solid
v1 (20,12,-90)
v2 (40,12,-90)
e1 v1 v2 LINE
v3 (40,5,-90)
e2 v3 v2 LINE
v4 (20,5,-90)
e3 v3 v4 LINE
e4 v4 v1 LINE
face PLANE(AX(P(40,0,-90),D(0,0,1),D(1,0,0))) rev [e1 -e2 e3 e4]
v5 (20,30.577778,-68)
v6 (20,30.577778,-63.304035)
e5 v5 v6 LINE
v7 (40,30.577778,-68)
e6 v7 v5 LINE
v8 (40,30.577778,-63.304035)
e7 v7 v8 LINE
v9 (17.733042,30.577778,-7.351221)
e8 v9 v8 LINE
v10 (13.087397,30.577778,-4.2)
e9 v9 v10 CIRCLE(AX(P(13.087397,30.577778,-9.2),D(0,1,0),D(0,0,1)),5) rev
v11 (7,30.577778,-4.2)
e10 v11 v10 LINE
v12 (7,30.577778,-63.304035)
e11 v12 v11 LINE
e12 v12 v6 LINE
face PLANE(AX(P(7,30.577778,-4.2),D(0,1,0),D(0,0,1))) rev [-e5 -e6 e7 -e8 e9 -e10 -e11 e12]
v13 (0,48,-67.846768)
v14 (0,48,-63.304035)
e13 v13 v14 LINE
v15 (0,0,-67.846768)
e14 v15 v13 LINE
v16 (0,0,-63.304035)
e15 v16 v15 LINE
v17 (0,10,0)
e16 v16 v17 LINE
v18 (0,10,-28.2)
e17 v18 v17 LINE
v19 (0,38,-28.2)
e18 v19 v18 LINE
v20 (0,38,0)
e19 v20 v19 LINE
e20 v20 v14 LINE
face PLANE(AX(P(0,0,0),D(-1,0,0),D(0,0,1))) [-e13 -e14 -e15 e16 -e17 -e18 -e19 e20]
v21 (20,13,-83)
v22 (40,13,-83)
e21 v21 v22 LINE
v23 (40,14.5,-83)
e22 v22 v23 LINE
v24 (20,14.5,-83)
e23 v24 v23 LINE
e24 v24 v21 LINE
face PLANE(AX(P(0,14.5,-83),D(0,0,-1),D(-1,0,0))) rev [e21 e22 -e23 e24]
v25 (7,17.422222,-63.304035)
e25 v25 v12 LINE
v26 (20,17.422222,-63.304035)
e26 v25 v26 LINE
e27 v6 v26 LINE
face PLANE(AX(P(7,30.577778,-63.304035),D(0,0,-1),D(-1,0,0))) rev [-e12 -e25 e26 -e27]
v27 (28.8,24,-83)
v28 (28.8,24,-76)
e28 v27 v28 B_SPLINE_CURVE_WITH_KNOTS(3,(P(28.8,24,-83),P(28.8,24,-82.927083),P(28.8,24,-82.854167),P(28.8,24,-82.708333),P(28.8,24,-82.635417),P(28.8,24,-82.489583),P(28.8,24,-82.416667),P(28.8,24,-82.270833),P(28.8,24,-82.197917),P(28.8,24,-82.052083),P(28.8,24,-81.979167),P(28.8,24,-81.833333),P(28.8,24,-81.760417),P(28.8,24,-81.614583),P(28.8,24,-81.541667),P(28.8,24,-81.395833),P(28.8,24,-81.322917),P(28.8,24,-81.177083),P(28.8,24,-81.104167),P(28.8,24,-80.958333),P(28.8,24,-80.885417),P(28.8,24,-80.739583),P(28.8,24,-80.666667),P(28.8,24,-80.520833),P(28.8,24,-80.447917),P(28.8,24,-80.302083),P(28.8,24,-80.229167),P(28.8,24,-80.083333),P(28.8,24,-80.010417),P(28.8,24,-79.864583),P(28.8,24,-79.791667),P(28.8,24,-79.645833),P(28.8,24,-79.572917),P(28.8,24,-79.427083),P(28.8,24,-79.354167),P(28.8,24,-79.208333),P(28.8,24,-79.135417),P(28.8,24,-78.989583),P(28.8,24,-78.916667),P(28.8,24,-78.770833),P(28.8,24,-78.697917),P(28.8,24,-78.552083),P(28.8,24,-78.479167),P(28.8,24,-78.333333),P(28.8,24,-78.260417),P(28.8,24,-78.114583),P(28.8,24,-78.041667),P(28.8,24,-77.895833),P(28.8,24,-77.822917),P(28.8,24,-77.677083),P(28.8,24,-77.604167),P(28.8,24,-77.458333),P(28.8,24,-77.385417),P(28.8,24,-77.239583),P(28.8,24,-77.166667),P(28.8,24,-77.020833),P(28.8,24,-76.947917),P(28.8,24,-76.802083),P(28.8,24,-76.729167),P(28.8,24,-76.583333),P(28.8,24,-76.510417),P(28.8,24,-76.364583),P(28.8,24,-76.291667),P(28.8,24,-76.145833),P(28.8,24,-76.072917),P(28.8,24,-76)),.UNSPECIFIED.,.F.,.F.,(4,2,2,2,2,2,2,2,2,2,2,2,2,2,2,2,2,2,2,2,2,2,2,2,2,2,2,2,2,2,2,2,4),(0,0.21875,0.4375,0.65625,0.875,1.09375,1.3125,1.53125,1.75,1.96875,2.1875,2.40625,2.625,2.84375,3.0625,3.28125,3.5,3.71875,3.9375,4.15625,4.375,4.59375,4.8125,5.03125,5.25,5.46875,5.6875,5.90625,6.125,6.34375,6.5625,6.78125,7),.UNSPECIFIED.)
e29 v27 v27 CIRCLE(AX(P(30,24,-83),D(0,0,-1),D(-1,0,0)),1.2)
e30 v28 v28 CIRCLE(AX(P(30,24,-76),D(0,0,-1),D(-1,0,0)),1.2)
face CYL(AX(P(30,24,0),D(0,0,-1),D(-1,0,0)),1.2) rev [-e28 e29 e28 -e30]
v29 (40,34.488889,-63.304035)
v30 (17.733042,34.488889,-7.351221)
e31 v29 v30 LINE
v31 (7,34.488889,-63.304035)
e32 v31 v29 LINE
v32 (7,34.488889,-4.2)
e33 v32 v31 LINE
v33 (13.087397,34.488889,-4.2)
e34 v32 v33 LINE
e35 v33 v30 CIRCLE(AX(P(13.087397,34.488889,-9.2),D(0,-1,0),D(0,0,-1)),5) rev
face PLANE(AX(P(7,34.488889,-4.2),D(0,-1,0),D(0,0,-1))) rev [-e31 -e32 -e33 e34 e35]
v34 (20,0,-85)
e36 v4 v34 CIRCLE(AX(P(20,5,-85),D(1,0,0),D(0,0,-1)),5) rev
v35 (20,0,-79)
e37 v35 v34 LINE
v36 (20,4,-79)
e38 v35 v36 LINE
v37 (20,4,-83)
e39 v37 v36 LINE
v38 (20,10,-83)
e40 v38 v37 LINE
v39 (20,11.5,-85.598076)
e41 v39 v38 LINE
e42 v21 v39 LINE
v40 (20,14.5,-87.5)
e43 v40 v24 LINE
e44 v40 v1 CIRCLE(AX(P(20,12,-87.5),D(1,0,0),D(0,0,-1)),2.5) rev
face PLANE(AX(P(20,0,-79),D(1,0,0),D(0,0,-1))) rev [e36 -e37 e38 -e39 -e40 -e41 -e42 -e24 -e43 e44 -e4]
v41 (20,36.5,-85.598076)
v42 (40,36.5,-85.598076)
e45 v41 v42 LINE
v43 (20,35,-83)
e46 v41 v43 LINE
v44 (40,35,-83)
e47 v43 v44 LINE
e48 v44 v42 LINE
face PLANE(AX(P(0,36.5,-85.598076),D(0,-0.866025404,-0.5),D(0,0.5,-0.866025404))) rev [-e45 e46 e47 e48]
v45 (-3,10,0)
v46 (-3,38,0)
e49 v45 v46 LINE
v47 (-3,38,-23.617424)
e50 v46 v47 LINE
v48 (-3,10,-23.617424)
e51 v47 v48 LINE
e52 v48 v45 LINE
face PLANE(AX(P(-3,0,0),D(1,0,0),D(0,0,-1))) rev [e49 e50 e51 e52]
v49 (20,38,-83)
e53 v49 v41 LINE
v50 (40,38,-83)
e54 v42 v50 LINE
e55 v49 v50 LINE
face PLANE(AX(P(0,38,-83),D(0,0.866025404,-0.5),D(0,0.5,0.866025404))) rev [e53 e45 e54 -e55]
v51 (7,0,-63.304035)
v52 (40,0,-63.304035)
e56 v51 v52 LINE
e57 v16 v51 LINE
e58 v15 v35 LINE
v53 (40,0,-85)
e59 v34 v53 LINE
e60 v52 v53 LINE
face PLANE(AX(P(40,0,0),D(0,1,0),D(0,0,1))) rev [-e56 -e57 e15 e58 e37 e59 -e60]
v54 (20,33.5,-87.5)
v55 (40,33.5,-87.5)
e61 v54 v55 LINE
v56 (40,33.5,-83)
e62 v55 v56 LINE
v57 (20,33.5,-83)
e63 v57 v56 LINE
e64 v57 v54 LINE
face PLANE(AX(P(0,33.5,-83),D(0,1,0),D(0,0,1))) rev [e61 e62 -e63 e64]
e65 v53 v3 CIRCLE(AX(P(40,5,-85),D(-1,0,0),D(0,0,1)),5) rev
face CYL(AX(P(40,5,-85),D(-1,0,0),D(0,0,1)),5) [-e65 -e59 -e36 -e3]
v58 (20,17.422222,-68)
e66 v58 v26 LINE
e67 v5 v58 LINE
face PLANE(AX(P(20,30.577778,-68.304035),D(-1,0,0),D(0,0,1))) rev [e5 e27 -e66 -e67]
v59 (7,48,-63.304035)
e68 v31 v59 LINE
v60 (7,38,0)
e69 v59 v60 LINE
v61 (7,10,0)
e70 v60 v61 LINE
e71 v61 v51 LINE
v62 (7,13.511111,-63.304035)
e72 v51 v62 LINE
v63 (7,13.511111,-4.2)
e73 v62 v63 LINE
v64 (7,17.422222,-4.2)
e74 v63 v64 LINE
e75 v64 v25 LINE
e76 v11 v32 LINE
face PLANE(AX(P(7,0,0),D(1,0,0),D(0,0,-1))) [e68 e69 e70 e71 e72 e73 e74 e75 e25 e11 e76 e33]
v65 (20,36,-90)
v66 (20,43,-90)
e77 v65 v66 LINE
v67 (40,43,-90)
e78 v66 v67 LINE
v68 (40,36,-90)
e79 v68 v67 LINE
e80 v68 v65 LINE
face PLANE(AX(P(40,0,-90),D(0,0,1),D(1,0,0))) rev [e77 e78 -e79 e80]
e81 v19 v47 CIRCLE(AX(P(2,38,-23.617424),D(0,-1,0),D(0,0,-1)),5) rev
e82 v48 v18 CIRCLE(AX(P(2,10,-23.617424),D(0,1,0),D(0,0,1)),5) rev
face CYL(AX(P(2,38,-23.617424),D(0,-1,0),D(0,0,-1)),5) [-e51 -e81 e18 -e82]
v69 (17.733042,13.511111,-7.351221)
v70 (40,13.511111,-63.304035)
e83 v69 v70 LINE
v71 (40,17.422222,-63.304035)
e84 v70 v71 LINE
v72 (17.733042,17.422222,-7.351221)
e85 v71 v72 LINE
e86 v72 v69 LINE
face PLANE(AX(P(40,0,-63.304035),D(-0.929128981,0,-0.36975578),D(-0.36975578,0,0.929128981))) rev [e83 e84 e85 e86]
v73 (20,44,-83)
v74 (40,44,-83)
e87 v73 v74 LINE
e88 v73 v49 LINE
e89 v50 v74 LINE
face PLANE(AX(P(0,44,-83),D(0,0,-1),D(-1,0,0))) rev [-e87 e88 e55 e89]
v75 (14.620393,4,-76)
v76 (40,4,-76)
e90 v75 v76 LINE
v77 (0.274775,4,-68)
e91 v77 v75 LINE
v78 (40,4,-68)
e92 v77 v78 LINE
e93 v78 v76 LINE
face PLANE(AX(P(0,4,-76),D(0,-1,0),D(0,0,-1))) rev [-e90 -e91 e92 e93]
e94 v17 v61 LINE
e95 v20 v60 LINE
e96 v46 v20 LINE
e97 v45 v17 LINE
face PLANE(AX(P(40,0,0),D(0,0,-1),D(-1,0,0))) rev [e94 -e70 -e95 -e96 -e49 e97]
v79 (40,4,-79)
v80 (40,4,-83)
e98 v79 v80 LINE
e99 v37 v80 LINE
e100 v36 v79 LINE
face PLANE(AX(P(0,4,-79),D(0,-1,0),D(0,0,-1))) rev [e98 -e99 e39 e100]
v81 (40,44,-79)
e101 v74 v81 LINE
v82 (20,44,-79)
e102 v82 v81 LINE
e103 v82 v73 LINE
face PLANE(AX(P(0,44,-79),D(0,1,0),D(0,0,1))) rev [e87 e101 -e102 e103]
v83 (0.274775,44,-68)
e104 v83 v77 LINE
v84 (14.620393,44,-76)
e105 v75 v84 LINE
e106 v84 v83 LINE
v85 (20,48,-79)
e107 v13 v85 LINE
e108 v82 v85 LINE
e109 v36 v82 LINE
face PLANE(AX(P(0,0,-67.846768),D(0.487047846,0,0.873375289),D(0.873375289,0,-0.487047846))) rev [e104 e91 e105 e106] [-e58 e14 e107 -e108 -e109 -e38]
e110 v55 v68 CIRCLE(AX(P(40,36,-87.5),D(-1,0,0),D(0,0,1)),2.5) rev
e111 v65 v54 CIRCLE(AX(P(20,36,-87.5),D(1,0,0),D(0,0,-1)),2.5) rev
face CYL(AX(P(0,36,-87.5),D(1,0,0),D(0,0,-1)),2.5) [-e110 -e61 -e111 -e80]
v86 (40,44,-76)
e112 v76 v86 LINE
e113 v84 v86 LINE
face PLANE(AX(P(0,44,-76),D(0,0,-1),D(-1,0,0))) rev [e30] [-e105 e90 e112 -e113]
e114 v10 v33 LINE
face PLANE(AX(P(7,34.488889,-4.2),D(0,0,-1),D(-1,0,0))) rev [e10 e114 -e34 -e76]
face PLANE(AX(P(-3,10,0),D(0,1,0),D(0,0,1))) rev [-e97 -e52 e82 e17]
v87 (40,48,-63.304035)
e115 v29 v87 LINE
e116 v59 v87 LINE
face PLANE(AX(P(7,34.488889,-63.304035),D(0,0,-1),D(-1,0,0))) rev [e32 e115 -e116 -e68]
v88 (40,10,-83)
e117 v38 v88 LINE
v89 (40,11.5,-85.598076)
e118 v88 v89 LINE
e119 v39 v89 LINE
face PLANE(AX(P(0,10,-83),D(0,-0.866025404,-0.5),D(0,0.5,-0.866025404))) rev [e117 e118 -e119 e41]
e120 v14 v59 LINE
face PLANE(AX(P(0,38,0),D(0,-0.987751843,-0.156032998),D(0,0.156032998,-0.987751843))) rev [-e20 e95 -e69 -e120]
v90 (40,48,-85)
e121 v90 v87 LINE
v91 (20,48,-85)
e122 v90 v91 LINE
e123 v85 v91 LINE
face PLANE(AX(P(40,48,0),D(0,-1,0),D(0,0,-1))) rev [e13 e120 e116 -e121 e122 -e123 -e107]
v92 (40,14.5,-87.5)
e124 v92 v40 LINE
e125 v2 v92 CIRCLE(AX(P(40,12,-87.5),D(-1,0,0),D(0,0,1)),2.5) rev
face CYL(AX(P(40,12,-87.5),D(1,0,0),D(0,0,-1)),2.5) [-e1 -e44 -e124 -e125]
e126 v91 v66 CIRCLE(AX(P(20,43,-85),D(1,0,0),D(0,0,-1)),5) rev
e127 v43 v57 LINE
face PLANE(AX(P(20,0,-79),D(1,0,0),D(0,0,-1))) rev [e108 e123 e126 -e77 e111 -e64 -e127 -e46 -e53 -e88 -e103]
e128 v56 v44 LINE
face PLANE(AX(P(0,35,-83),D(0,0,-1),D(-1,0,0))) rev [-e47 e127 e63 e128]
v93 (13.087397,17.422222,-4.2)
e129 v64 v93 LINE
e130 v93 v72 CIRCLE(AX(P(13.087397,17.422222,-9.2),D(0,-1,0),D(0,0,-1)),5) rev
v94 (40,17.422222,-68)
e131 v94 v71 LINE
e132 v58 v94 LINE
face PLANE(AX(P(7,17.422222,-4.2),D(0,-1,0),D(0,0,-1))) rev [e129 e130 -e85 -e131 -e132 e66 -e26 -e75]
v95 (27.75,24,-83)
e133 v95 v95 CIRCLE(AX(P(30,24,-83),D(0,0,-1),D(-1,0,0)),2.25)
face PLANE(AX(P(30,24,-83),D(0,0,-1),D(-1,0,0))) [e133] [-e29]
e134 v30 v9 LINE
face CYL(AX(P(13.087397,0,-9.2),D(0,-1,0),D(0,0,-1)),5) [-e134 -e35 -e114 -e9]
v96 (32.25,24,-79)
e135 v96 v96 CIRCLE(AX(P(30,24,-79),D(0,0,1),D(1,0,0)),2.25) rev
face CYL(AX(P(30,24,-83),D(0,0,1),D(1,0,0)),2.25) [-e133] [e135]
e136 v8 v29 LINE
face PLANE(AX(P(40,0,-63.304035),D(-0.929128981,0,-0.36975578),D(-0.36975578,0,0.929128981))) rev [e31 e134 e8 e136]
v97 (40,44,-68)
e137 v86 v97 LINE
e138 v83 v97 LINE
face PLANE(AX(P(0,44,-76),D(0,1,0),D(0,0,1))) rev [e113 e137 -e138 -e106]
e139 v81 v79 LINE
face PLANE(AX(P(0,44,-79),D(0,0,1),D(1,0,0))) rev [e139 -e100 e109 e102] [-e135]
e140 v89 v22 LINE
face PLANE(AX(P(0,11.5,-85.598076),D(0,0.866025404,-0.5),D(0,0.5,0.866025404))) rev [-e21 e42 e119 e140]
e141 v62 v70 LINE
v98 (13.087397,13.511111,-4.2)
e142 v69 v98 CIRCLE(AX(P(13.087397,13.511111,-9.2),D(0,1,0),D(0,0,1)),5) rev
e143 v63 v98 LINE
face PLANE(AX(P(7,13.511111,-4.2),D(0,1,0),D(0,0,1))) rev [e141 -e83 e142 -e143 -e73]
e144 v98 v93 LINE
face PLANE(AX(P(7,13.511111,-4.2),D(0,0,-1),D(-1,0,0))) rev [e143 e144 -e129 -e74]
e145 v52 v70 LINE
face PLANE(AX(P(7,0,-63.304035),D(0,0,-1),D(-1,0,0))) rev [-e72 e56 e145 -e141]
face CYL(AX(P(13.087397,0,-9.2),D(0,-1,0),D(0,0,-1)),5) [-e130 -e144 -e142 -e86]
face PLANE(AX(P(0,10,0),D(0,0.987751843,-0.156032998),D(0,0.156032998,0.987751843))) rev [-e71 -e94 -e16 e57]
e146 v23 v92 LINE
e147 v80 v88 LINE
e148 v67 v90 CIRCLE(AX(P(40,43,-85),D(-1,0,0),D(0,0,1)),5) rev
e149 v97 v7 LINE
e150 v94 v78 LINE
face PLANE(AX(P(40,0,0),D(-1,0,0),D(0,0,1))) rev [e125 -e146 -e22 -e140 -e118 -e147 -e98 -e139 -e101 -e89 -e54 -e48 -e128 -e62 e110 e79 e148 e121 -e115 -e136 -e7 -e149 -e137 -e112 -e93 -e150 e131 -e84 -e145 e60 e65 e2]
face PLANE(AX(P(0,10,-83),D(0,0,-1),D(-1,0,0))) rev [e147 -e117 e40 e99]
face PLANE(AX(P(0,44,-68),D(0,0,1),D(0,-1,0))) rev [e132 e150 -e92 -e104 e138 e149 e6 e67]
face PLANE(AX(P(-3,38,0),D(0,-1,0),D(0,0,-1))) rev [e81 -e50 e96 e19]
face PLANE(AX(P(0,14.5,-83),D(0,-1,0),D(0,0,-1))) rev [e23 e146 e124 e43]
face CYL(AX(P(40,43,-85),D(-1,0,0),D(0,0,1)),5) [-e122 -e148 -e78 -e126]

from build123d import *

# Parameters (mm, degrees)
SKETCH_1_W          = 90
SKETCH_1_H          = 48
EXTRUDE_1_DEPTH     = 40
CUT_EXTRUDE_1_DEPTH = 40
CUT_EXTRUDE_2_DEPTH = 110.562767398
CUT_EXTRUDE_3_DEPTH = 110.562767398
CUT_EXTRUDE_4_DEPTH = 33
SKETCH_6_W          = 8
SKETCH_6_H          = 40
CUT_EXTRUDE_5_DEPTH = 110.562767398
SKETCH_7_W          = 20
SKETCH_7_H          = 13.155555556
CUT_EXTRUDE_6_DEPTH = 5
SKETCH_8_W          = 28.2
SKETCH_8_H          = 28
EXTRUDE_2_DEPTH     = 3
SKETCH_9_R          = 2.25
EXTRUDE_3_DEPTH     = 4
SKETCH_10_R         = 1.2
CUT_EXTRUDE_7_DEPTH = 104.889364229
FILLET_1_R          = 5
FILLET_2_R          = 2.5


with BuildPart() as part:
    # 스케치1 → 보스-돌출1 (new body)
    with BuildSketch(Plane(origin=(0, 0, 0), x_dir=(0, 0, -1), z_dir=(1, 0, 0))):
        with Locations((45, 24)):
            Rectangle(SKETCH_1_W, SKETCH_1_H)
    extrude(amount=EXTRUDE_1_DEPTH)

    # 스케치2 → 컷-돌출1 (cut)
    with BuildSketch(Plane(origin=(40, 0, 0), x_dir=(0, 0, -1), z_dir=(1, 0, 0))):
        Polygon((79, 44), (83, 44), (83, 38), (85.598076211, 36.5), (83, 35), (83, 33.5), (90, 33.5), (90, 14.5), (83, 14.5), (83, 13), (85.598076211, 11.5), (83, 10), (83, 4), (79, 4), align=None)
        Polygon((0, 38), (63.304035288, 48), (0, 48), align=None)
        Polygon((0, 10), (63.304035288, 0), (0, 0), align=None)
    extrude(amount=-CUT_EXTRUDE_1_DEPTH, mode=Mode.SUBTRACT)

    # 스케치3 → 컷-돌출2 (cut, through all)
    with BuildSketch(Plane(origin=(0, 48, 0), x_dir=(1, 0, 0), z_dir=(0, 1, 0))):
        Polygon((0, 67.846768337), (20, 79), (20, 90), (0, 90), align=None)
    extrude(amount=-CUT_EXTRUDE_2_DEPTH, mode=Mode.SUBTRACT)

    # 스케치4 → 컷-돌출3 (cut, through all)
    with BuildSketch(Plane(origin=(0, 48, 0), x_dir=(1, 0, 0), z_dir=(0, 1, 0))):
        Polygon((40, 63.304035288), (14.807552651, 0), (40, 0), align=None)
    extrude(amount=-CUT_EXTRUDE_3_DEPTH, mode=Mode.SUBTRACT)

    # 스케치5 → 컷-돌출4 (cut)
    with BuildSketch(Plane(origin=(40, 0, 0), x_dir=(0, 0, -1), z_dir=(1, 0, 0))):
        Polygon((4.2, 34.488888889), (63.304035288, 34.488888889), (63.304035288, 48), (0, 38), (0, 10), (63.304035288, 0), (63.304035288, 13.511111111), (4.2, 13.511111111), (4.2, 17.422222222), (63.304035288, 17.422222222), (63.304035288, 30.577777778), (4.2, 30.577777778), align=None)
    extrude(amount=-CUT_EXTRUDE_4_DEPTH, mode=Mode.SUBTRACT)

    # 스케치6 → 컷-돌출5 (cut, through all)
    with BuildSketch(Plane(origin=(40, 0, 0), x_dir=(0, 0, -1), z_dir=(1, 0, 0))):
        with Locations((72, 24)):
            Rectangle(SKETCH_6_W, SKETCH_6_H)
    extrude(amount=-CUT_EXTRUDE_5_DEPTH, mode=Mode.SUBTRACT)

    # 스케치7 → 컷-돌출6 (cut)
    with BuildSketch(Plane.XY.offset(-63.304035288)):
        with Locations((30, 24)):
            Rectangle(SKETCH_7_W, SKETCH_7_H)
    extrude(amount=-CUT_EXTRUDE_6_DEPTH, mode=Mode.SUBTRACT)

    # 스케치8 → 보스-돌출2 (add)
    with BuildSketch(Plane.ZY):
        with Locations((-14.1, 24)):
            Rectangle(SKETCH_8_W, SKETCH_8_H)
    extrude(amount=EXTRUDE_2_DEPTH)

    # 스케치9 → 보스-돌출3 (add)
    with BuildSketch(Plane(origin=(0, 0, -79), x_dir=(-1, 0, 0), z_dir=(0, 0, -1))):
        with Locations(Location((-30, 24, 0), (0, 0, 180))):
            Circle(SKETCH_9_R)
    extrude(amount=EXTRUDE_3_DEPTH)

    # 스케치10 → 컷-돌출7 (cut, through all)
    with BuildSketch(Plane(origin=(0, 0, -83), x_dir=(-1, 0, 0), z_dir=(0, 0, -1))):
        with Locations((-30, 24)):
            Circle(SKETCH_10_R)
    extrude(amount=-CUT_EXTRUDE_7_DEPTH, mode=Mode.SUBTRACT)

    # 필렛1
    # the kernel refuses this fillet: 5 mm, written as the material it takes off along each edge
    with BuildSketch(Plane(origin=(-3, 49.456439237, -28.2), x_dir=(1, 0, 0), z_dir=(0, -1, 0))) as fillet_1_piece_1:
        with BuildLine():
            CenterArc((5, 4.582575695), FILLET_1_R, 180, 66.421821522)
            Line((0, 4.582575695), (-0.1, 4.582575695))
            Line((-0.1, 4.582575695), (-0.1, 0))
            Line((-0.1, 0), (0, -0.1))
            ThreePointArc((0, -0.1), (1.5, -0.1), (2.96, -0.091651514))
            Line((2.96, -0.091651514), (3, 0))
        make_face()
    extrude(amount=50.912878475, mode=Mode.SUBTRACT)
    with BuildSketch(Plane(origin=(16.47898289, 25.901187913, -4.2), x_dir=(0.36975577982440216, 0, -0.9291289809743576), z_dir=(0, -1, 0)), Plane(origin=(16.47898289, 42.96785458, -4.2), x_dir=(0.36975577982440216, 0, -0.9291289809743576), z_dir=(0, -1, 0))) as fillet_1_piece_2:
        with BuildLine():
            CenterArc((FILLET_1_R * 0.67831725528, -FILLET_1_R), FILLET_1_R, 90, 68.299443615)
            Line((-FILLET_1_R * 0.250811725694, -FILLET_1_R * 0.630244220176), (-FILLET_1_R * 0.269394305314, -FILLET_1_R * 0.622849104579))
            Line((-FILLET_1_R * 0.269394305314, -FILLET_1_R * 0.622849104579), (-FILLET_1_R * 0.0135663451056, FILLET_1_R * 0.02))
            Line((-FILLET_1_R * 0.0135663451056, FILLET_1_R * 0.02), (FILLET_1_R * 0.67831725528, FILLET_1_R * 0.02))
            Line((FILLET_1_R * 0.67831725528, FILLET_1_R * 0.02), (FILLET_1_R * 0.67831725528, 0))
        make_face()
    extrude(amount=20.869042493, mode=Mode.SUBTRACT)
    with BuildSketch(Plane(origin=(7.5, 0, -90), x_dir=(0, 0, 1), z_dir=(1, 0, 0))) as fillet_1_piece_3:
        with BuildLine():
            CenterArc((FILLET_1_R, -FILLET_1_R), FILLET_1_R, 90, 90)
            Line((0, -FILLET_1_R), (-FILLET_1_R * 0.02, -FILLET_1_R))
            Line((-FILLET_1_R * 0.02, -FILLET_1_R), (-FILLET_1_R * 0.02, FILLET_1_R * 0.02))
            Line((-FILLET_1_R * 0.02, FILLET_1_R * 0.02), (FILLET_1_R, FILLET_1_R * 0.02))
            Line((FILLET_1_R, FILLET_1_R * 0.02), (FILLET_1_R, 0))
        make_face()
    extrude(amount=45, mode=Mode.SUBTRACT)
    with BuildSketch(Plane(origin=(7.5, 48, -90), x_dir=(0, 0, 1), z_dir=(1, 0, 0))) as fillet_1_piece_4:
        with BuildLine():
            CenterArc((FILLET_1_R, FILLET_1_R), FILLET_1_R, 180, 90)
            Line((0, FILLET_1_R), (-FILLET_1_R * 0.02, FILLET_1_R))
            Line((-FILLET_1_R * 0.02, FILLET_1_R), (-FILLET_1_R * 0.02, -FILLET_1_R * 0.02))
            Line((-FILLET_1_R * 0.02, -FILLET_1_R * 0.02), (FILLET_1_R, -FILLET_1_R * 0.02))
            Line((FILLET_1_R, -FILLET_1_R * 0.02), (FILLET_1_R, 0))
        make_face()
    extrude(amount=45, mode=Mode.SUBTRACT)

    # 필렛2
    fillet_2_edges = [part.edges().sort_by_distance(p)[0] for p in [
        (30, 14.5, -90),
        (30, 33.5, -90),
    ]]
    fillet(fillet_2_edges, radius=FILLET_2_R)


solid = part.part
